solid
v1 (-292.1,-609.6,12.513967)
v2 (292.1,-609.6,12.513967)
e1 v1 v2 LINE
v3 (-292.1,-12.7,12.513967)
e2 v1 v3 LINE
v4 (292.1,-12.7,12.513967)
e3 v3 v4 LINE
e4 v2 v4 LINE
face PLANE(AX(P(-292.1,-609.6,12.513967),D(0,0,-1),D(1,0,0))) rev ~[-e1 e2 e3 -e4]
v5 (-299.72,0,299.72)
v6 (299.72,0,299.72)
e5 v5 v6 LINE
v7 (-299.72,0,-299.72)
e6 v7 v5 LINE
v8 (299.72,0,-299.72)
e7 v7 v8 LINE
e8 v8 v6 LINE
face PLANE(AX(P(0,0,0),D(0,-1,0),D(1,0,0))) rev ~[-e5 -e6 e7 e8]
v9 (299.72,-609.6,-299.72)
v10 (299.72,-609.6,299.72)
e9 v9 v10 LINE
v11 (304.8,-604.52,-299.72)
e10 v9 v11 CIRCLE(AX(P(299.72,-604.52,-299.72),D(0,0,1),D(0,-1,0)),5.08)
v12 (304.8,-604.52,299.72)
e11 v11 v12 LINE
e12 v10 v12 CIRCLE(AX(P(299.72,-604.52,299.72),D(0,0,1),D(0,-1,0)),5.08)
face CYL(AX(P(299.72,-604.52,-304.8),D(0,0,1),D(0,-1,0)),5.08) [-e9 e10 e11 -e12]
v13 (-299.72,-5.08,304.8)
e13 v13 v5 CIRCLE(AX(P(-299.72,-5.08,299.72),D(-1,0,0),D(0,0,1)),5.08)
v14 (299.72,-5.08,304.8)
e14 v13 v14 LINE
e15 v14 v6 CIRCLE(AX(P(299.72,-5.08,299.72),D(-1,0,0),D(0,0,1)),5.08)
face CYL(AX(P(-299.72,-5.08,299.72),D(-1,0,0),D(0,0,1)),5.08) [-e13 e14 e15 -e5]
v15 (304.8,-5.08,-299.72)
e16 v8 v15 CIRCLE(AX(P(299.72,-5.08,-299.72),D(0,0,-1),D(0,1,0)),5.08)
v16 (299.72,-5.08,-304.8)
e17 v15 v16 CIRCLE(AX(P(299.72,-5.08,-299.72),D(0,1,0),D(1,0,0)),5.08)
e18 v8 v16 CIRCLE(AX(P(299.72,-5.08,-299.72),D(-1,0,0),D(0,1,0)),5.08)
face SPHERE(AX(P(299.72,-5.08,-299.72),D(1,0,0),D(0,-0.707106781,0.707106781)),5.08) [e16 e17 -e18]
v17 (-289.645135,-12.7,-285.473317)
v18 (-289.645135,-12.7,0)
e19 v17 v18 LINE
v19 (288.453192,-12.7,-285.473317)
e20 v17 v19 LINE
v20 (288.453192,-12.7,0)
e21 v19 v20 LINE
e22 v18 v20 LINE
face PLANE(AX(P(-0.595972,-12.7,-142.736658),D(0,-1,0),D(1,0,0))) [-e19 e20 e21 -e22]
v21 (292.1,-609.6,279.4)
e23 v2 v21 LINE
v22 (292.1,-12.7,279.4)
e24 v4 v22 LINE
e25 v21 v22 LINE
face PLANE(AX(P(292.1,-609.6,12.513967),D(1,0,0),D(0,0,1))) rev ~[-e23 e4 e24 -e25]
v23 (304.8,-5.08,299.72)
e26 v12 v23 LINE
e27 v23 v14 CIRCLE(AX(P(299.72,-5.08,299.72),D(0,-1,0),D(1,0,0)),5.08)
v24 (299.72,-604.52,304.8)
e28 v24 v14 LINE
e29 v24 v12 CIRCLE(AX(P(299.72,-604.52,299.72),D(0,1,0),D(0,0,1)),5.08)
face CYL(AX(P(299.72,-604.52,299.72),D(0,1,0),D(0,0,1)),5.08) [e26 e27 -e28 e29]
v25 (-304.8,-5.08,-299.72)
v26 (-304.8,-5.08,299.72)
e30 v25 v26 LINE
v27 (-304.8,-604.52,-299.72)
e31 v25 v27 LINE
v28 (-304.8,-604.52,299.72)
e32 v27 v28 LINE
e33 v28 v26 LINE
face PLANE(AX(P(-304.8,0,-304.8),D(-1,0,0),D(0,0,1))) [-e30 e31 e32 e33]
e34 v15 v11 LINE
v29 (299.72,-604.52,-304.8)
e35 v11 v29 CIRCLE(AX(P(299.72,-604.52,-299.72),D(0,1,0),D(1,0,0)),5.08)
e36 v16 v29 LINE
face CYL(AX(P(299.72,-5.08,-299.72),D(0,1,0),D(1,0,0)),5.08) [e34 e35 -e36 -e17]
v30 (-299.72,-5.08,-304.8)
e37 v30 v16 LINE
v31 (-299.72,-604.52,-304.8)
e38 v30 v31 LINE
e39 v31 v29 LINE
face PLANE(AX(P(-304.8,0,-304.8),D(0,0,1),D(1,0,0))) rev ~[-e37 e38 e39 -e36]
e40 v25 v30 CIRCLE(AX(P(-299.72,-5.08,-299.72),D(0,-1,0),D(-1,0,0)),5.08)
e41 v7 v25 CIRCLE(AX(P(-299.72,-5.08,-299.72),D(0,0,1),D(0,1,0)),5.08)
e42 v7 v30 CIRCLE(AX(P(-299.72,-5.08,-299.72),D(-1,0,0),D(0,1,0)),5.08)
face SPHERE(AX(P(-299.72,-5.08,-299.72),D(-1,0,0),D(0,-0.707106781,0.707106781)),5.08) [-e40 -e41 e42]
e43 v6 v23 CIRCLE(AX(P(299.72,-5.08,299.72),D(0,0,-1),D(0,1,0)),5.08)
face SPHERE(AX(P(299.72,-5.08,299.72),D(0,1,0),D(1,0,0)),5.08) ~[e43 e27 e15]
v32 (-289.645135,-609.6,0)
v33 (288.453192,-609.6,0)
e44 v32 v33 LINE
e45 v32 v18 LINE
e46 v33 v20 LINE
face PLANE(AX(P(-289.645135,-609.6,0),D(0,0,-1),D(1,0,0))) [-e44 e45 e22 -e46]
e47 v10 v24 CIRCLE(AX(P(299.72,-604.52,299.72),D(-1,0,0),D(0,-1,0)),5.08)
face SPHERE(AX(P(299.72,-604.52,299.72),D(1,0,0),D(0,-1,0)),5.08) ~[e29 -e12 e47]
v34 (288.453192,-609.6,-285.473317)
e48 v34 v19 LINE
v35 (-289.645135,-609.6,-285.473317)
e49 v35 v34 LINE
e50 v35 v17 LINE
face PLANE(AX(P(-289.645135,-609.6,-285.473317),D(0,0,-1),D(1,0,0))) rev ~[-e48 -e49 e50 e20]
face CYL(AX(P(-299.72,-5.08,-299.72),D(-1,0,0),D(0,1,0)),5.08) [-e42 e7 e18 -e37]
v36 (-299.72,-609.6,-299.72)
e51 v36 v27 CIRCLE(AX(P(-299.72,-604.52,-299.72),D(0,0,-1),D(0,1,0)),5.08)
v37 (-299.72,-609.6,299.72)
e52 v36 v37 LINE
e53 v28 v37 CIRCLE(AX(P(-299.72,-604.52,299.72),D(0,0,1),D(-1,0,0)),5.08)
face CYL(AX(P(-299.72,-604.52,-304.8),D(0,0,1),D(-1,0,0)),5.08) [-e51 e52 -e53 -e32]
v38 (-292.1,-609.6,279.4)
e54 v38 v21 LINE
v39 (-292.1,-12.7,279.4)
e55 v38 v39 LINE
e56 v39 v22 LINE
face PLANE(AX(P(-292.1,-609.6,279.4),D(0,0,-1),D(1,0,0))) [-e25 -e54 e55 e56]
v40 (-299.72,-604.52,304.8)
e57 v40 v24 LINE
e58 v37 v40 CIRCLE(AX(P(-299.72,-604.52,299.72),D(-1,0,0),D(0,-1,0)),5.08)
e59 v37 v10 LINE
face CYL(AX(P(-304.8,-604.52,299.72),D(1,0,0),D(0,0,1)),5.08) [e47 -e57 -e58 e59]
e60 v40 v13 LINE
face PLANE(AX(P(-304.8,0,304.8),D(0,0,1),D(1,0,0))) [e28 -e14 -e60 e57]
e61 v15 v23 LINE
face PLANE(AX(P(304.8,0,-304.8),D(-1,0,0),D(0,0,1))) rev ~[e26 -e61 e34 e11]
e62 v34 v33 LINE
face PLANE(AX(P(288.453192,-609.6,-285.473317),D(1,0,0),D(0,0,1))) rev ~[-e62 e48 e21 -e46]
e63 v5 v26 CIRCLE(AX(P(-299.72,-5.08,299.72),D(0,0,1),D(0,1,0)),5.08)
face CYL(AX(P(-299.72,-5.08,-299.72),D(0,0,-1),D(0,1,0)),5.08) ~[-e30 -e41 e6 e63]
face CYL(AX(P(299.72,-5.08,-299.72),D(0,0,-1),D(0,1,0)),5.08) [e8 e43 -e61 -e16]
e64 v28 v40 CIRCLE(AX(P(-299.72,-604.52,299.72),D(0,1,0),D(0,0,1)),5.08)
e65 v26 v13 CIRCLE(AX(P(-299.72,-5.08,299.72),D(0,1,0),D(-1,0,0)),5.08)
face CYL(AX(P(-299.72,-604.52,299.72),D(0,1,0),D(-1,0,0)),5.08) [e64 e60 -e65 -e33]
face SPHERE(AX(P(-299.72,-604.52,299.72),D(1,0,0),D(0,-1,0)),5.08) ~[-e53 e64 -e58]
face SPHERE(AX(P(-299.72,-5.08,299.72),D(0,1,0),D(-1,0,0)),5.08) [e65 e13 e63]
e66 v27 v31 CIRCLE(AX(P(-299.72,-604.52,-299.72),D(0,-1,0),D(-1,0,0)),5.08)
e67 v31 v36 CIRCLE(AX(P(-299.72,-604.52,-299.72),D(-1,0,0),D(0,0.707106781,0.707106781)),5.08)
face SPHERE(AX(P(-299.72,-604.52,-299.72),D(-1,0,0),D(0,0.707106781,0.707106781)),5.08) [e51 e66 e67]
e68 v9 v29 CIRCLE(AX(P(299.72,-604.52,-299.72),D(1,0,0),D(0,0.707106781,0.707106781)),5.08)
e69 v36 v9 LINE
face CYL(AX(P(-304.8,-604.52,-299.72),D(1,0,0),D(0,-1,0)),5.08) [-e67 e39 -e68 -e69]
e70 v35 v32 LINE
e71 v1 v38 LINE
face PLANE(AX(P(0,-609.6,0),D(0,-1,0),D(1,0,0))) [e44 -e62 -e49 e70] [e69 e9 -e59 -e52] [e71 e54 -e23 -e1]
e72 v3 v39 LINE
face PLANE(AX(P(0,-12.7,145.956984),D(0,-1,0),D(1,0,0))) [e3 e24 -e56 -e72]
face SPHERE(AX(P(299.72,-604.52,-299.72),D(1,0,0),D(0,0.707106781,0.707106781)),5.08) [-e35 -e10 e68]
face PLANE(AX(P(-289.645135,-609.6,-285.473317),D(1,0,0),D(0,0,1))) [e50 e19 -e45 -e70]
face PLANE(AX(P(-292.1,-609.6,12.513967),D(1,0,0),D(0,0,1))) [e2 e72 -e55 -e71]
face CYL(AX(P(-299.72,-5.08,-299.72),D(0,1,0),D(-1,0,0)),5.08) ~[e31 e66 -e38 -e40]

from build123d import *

# Parameters (mm, degrees)
F0_W         = 609.6
F0_H         = 609.6
F1_DEPTH     = 609.6
F3_R         = 5.08
F4_R         = 5.08
F5_T1_DEPTH  = 599.44
F5_T3_DEPTH  = 599.44
F5_T5_DEPTH  = 599.44
F5_S9_W      = 5.08
F5_S9_H      = 5.08
F5_T10_DEPTH = 5.08
F5_S15_W     = 5.08
F5_S15_H     = 5.08
F5_T16_DEPTH = 5.08
F5_S21_W     = 5.08
F5_S21_H     = 5.08
F5_T22_DEPTH = 5.08
F5_S27_W     = 5.08
F5_S27_H     = 5.08
F5_T28_DEPTH = 5.08
F5_T32_ANGLE = 90
F5_T34_ANGLE = 90
F2_W         = 584.2
F2_H         = 266.8860325682
F6_DEPTH     = 596.9
F7_W         = 578.0983269215
F7_H         = 285.4733169079
F8_DEPTH     = 596.9


# Not quite as in the source:
# - a fillet or chamfer that OpenCascade refuses, or shapes differently, is made with other operations: its cross-section is extruded or revolved along the edge and cut away or added


with BuildPart() as f1:
    # F0 (on Front) → F1 (new body)
    with BuildSketch(Plane.XZ):
        Rectangle(F0_W, F0_H)
    extrude(amount=F1_DEPTH)

    # F3
    f3_edges = [f1.edges().sort_by_distance(p)[0] for p in [
        (0, -609.6, 304.8),
    ]]
    fillet(f3_edges, radius=F3_R)

    # F4
    f4_edges = [f1.edges().sort_by_distance(p)[0] for p in [
        (-304.8, -609.6, -2.54),
        (304.8, -609.6, -2.54),
        (0, -609.6, -304.8),
    ]]
    fillet(f4_edges, radius=F4_R)

    # F5: fillet of radius 5.08 on 7 edges, made by hand

    # F5_s2 → F5_t1 (cut)
    with BuildSketch(Plane.XZ.offset(5.08)):
        with BuildLine():
            ThreePointArc((304.8, -299.72), (303.3121024484, -303.3121024484), (299.72, -304.8))
            Line((299.72, -304.8), (304.8, -304.8))
            Line((304.8, -304.8), (304.8, -299.72))
        make_face()
        with BuildLine():
            ThreePointArc((-304.8, -299.72), (-303.3121024484, -303.3121024484), (-299.72, -304.8))
            Line((-299.72, -304.8), (-304.8, -304.8))
            Line((-304.8, -304.8), (-304.8, -299.72))
        make_face()
    extrude(amount=F5_T1_DEPTH, mode=Mode.SUBTRACT)

    # F5_s4 → F5_t3 (cut)
    with BuildSketch(Plane.XY.offset(-299.72)):
        with BuildLine():
            ThreePointArc((299.72, 0), (303.3121024484, -1.4878975516), (304.8, -5.08))
            Line((304.8, -5.08), (304.8, 0))
            Line((304.8, 0), (299.72, 0))
        make_face()
        with BuildLine():
            ThreePointArc((-299.72, 0), (-303.3121024484, -1.4878975516), (-304.8, -5.08))
            Line((-304.8, -5.08), (-304.8, 0))
            Line((-304.8, 0), (-299.72, 0))
        make_face()
    extrude(amount=F5_T3_DEPTH, mode=Mode.SUBTRACT)

    # F5_s6 → F5_t5 (cut)
    with BuildSketch(Plane.YZ.offset(-299.72)):
        with BuildLine():
            ThreePointArc((-5.08, 304.8), (-1.4878975516, 303.3121024484), (0, 299.72))
            Line((0, 299.72), (0, 304.8))
            Line((0, 304.8), (-5.08, 304.8))
        make_face()
        with BuildLine():
            ThreePointArc((0, -299.72), (-1.4878975516, -303.3121024484), (-5.08, -304.8))
            Line((-5.08, -304.8), (0, -304.8))
            Line((0, -304.8), (0, -299.72))
        make_face()
    extrude(amount=F5_T5_DEPTH, mode=Mode.SUBTRACT)


with BuildPart() as f5_tool8:
    # F5_s9 → F5_t10 (new body)
    with BuildSketch(Plane.YZ.offset(-299.72)):
        with Locations((-607.06, -302.26)):
            Rectangle(F5_S9_W, F5_S9_H)
    extrude(amount=-F5_T10_DEPTH)

    # F5_s11 → F5_t12 (revolve, cut)
    with BuildSketch(Plane(origin=(-299.72, -604.52, -299.72), x_dir=(0, 0.7071067812, 0.7071067812), z_dir=(0, -0.7071067812, 0.7071067812))):
        with BuildLine():
            ThreePointArc((0, -5.08), (5.08, 0), (0, 5.08))
            Line((0, 5.08), (0, -5.08))
        make_face()
    revolve(axis=Axis((-299.72, -604.52, -299.72), (-1, 0, 0)), mode=Mode.SUBTRACT)


with BuildPart() as f1_1:
    add(f1.part)

    # F5_t7: cut F5_tool8
    add(f5_tool8.part, mode=Mode.SUBTRACT)


with BuildPart() as f5_tool14:
    # F5_s15 → F5_t16 (new body)
    with BuildSketch(Plane.YZ.offset(299.72)):
        with Locations((-607.06, -302.26)):
            Rectangle(F5_S15_W, F5_S15_H)
    extrude(amount=F5_T16_DEPTH)

    # F5_s17 → F5_t18 (revolve, cut)
    with BuildSketch(Plane(origin=(299.72, -604.52, -299.72), x_dir=(0, 0.7071067812, 0.7071067812), z_dir=(0, 0.7071067812, -0.7071067812))):
        with BuildLine():
            ThreePointArc((0, -5.08), (5.08, 0), (0, 5.08))
            Line((0, 5.08), (0, -5.08))
        make_face()
    revolve(axis=Axis((299.72, -604.52, -299.72), (1, 0, 0)), mode=Mode.SUBTRACT)


with BuildPart() as f1_2:
    add(f1_1.part)

    # F5_t13: cut F5_tool14
    add(f5_tool14.part, mode=Mode.SUBTRACT)


with BuildPart() as f5_tool20:
    # F5_s21 → F5_t22 (new body)
    with BuildSketch(Plane.YZ.offset(299.72)):
        with Locations((-2.54, -302.26)):
            Rectangle(F5_S21_W, F5_S21_H)
    extrude(amount=F5_T22_DEPTH)

    # F5_s23 → F5_t24 (revolve, cut)
    with BuildSketch(Plane(origin=(299.72, -5.08, -299.72), x_dir=(0, -0.7071067812, 0.7071067812), z_dir=(0, 0.7071067812, 0.7071067812))):
        with BuildLine():
            ThreePointArc((0, -5.08), (5.08, 0), (0, 5.08))
            Line((0, 5.08), (0, -5.08))
        make_face()
    revolve(axis=Axis((299.72, -5.08, -299.72), (1, 0, 0)), mode=Mode.SUBTRACT)


with BuildPart() as f1_3:
    add(f1_2.part)

    # F5_t19: cut F5_tool20
    add(f5_tool20.part, mode=Mode.SUBTRACT)


with BuildPart() as f5_tool26:
    # F5_s27 → F5_t28 (new body)
    with BuildSketch(Plane.YZ.offset(-299.72)):
        with Locations((-2.54, -302.26)):
            Rectangle(F5_S27_W, F5_S27_H)
    extrude(amount=-F5_T28_DEPTH)

    # F5_s29 → F5_t30 (revolve, cut)
    with BuildSketch(Plane(origin=(-299.72, -5.08, -299.72), x_dir=(0, -0.7071067812, 0.7071067812), z_dir=(0, -0.7071067812, -0.7071067812))):
        with BuildLine():
            ThreePointArc((0, -5.08), (5.08, 0), (0, 5.08))
            Line((0, 5.08), (0, -5.08))
        make_face()
    revolve(axis=Axis((-299.72, -5.08, -299.72), (-1, 0, 0)), mode=Mode.SUBTRACT)


with BuildPart() as f1_4:
    add(f1_3.part)

    # F5_t25: cut F5_tool26
    add(f5_tool26.part, mode=Mode.SUBTRACT)

    # F5_s31 → F5_t32 (revolve, cut)
    with BuildSketch(Plane.XY.offset(299.72)):
        with BuildLine():
            ThreePointArc((-304.8, -5.08), (-303.3121024484, -1.4878975516), (-299.72, 0))
            Line((-299.72, 0), (-304.8, 0))
            Line((-304.8, 0), (-304.8, -5.08))
        make_face()
    revolve(axis=Axis((-299.72, 0, 299.72), (0, 1, 0)), revolution_arc=F5_T32_ANGLE, mode=Mode.SUBTRACT)

    # F5_s33 → F5_t34 (revolve, cut)
    with BuildSketch(Plane.XY.offset(299.72)):
        with BuildLine():
            ThreePointArc((304.8, -5.08), (303.3121024484, -1.4878975516), (299.72, 0))
            Line((299.72, 0), (304.8, 0))
            Line((304.8, 0), (304.8, -5.08))
        make_face()
    revolve(axis=Axis((299.72, 0, 299.72), (0, -1, 0)), revolution_arc=F5_T34_ANGLE, mode=Mode.SUBTRACT)

    # F2 (on face) → F6 (cut)
    with BuildSketch(Plane.XZ.offset(609.6)):
        with Locations((0, 145.9569837159)):
            Rectangle(F2_W, F2_H)
    extrude(amount=-F6_DEPTH, mode=Mode.SUBTRACT)

    # F7 (on face) → F8 (cut)
    with BuildSketch(Plane.XZ.offset(609.6)):
        with Locations((-0.5959719419, -142.7366584539)):
            Rectangle(F7_W, F7_H)
    extrude(amount=-F8_DEPTH, mode=Mode.SUBTRACT)


solid = f1_4.part
